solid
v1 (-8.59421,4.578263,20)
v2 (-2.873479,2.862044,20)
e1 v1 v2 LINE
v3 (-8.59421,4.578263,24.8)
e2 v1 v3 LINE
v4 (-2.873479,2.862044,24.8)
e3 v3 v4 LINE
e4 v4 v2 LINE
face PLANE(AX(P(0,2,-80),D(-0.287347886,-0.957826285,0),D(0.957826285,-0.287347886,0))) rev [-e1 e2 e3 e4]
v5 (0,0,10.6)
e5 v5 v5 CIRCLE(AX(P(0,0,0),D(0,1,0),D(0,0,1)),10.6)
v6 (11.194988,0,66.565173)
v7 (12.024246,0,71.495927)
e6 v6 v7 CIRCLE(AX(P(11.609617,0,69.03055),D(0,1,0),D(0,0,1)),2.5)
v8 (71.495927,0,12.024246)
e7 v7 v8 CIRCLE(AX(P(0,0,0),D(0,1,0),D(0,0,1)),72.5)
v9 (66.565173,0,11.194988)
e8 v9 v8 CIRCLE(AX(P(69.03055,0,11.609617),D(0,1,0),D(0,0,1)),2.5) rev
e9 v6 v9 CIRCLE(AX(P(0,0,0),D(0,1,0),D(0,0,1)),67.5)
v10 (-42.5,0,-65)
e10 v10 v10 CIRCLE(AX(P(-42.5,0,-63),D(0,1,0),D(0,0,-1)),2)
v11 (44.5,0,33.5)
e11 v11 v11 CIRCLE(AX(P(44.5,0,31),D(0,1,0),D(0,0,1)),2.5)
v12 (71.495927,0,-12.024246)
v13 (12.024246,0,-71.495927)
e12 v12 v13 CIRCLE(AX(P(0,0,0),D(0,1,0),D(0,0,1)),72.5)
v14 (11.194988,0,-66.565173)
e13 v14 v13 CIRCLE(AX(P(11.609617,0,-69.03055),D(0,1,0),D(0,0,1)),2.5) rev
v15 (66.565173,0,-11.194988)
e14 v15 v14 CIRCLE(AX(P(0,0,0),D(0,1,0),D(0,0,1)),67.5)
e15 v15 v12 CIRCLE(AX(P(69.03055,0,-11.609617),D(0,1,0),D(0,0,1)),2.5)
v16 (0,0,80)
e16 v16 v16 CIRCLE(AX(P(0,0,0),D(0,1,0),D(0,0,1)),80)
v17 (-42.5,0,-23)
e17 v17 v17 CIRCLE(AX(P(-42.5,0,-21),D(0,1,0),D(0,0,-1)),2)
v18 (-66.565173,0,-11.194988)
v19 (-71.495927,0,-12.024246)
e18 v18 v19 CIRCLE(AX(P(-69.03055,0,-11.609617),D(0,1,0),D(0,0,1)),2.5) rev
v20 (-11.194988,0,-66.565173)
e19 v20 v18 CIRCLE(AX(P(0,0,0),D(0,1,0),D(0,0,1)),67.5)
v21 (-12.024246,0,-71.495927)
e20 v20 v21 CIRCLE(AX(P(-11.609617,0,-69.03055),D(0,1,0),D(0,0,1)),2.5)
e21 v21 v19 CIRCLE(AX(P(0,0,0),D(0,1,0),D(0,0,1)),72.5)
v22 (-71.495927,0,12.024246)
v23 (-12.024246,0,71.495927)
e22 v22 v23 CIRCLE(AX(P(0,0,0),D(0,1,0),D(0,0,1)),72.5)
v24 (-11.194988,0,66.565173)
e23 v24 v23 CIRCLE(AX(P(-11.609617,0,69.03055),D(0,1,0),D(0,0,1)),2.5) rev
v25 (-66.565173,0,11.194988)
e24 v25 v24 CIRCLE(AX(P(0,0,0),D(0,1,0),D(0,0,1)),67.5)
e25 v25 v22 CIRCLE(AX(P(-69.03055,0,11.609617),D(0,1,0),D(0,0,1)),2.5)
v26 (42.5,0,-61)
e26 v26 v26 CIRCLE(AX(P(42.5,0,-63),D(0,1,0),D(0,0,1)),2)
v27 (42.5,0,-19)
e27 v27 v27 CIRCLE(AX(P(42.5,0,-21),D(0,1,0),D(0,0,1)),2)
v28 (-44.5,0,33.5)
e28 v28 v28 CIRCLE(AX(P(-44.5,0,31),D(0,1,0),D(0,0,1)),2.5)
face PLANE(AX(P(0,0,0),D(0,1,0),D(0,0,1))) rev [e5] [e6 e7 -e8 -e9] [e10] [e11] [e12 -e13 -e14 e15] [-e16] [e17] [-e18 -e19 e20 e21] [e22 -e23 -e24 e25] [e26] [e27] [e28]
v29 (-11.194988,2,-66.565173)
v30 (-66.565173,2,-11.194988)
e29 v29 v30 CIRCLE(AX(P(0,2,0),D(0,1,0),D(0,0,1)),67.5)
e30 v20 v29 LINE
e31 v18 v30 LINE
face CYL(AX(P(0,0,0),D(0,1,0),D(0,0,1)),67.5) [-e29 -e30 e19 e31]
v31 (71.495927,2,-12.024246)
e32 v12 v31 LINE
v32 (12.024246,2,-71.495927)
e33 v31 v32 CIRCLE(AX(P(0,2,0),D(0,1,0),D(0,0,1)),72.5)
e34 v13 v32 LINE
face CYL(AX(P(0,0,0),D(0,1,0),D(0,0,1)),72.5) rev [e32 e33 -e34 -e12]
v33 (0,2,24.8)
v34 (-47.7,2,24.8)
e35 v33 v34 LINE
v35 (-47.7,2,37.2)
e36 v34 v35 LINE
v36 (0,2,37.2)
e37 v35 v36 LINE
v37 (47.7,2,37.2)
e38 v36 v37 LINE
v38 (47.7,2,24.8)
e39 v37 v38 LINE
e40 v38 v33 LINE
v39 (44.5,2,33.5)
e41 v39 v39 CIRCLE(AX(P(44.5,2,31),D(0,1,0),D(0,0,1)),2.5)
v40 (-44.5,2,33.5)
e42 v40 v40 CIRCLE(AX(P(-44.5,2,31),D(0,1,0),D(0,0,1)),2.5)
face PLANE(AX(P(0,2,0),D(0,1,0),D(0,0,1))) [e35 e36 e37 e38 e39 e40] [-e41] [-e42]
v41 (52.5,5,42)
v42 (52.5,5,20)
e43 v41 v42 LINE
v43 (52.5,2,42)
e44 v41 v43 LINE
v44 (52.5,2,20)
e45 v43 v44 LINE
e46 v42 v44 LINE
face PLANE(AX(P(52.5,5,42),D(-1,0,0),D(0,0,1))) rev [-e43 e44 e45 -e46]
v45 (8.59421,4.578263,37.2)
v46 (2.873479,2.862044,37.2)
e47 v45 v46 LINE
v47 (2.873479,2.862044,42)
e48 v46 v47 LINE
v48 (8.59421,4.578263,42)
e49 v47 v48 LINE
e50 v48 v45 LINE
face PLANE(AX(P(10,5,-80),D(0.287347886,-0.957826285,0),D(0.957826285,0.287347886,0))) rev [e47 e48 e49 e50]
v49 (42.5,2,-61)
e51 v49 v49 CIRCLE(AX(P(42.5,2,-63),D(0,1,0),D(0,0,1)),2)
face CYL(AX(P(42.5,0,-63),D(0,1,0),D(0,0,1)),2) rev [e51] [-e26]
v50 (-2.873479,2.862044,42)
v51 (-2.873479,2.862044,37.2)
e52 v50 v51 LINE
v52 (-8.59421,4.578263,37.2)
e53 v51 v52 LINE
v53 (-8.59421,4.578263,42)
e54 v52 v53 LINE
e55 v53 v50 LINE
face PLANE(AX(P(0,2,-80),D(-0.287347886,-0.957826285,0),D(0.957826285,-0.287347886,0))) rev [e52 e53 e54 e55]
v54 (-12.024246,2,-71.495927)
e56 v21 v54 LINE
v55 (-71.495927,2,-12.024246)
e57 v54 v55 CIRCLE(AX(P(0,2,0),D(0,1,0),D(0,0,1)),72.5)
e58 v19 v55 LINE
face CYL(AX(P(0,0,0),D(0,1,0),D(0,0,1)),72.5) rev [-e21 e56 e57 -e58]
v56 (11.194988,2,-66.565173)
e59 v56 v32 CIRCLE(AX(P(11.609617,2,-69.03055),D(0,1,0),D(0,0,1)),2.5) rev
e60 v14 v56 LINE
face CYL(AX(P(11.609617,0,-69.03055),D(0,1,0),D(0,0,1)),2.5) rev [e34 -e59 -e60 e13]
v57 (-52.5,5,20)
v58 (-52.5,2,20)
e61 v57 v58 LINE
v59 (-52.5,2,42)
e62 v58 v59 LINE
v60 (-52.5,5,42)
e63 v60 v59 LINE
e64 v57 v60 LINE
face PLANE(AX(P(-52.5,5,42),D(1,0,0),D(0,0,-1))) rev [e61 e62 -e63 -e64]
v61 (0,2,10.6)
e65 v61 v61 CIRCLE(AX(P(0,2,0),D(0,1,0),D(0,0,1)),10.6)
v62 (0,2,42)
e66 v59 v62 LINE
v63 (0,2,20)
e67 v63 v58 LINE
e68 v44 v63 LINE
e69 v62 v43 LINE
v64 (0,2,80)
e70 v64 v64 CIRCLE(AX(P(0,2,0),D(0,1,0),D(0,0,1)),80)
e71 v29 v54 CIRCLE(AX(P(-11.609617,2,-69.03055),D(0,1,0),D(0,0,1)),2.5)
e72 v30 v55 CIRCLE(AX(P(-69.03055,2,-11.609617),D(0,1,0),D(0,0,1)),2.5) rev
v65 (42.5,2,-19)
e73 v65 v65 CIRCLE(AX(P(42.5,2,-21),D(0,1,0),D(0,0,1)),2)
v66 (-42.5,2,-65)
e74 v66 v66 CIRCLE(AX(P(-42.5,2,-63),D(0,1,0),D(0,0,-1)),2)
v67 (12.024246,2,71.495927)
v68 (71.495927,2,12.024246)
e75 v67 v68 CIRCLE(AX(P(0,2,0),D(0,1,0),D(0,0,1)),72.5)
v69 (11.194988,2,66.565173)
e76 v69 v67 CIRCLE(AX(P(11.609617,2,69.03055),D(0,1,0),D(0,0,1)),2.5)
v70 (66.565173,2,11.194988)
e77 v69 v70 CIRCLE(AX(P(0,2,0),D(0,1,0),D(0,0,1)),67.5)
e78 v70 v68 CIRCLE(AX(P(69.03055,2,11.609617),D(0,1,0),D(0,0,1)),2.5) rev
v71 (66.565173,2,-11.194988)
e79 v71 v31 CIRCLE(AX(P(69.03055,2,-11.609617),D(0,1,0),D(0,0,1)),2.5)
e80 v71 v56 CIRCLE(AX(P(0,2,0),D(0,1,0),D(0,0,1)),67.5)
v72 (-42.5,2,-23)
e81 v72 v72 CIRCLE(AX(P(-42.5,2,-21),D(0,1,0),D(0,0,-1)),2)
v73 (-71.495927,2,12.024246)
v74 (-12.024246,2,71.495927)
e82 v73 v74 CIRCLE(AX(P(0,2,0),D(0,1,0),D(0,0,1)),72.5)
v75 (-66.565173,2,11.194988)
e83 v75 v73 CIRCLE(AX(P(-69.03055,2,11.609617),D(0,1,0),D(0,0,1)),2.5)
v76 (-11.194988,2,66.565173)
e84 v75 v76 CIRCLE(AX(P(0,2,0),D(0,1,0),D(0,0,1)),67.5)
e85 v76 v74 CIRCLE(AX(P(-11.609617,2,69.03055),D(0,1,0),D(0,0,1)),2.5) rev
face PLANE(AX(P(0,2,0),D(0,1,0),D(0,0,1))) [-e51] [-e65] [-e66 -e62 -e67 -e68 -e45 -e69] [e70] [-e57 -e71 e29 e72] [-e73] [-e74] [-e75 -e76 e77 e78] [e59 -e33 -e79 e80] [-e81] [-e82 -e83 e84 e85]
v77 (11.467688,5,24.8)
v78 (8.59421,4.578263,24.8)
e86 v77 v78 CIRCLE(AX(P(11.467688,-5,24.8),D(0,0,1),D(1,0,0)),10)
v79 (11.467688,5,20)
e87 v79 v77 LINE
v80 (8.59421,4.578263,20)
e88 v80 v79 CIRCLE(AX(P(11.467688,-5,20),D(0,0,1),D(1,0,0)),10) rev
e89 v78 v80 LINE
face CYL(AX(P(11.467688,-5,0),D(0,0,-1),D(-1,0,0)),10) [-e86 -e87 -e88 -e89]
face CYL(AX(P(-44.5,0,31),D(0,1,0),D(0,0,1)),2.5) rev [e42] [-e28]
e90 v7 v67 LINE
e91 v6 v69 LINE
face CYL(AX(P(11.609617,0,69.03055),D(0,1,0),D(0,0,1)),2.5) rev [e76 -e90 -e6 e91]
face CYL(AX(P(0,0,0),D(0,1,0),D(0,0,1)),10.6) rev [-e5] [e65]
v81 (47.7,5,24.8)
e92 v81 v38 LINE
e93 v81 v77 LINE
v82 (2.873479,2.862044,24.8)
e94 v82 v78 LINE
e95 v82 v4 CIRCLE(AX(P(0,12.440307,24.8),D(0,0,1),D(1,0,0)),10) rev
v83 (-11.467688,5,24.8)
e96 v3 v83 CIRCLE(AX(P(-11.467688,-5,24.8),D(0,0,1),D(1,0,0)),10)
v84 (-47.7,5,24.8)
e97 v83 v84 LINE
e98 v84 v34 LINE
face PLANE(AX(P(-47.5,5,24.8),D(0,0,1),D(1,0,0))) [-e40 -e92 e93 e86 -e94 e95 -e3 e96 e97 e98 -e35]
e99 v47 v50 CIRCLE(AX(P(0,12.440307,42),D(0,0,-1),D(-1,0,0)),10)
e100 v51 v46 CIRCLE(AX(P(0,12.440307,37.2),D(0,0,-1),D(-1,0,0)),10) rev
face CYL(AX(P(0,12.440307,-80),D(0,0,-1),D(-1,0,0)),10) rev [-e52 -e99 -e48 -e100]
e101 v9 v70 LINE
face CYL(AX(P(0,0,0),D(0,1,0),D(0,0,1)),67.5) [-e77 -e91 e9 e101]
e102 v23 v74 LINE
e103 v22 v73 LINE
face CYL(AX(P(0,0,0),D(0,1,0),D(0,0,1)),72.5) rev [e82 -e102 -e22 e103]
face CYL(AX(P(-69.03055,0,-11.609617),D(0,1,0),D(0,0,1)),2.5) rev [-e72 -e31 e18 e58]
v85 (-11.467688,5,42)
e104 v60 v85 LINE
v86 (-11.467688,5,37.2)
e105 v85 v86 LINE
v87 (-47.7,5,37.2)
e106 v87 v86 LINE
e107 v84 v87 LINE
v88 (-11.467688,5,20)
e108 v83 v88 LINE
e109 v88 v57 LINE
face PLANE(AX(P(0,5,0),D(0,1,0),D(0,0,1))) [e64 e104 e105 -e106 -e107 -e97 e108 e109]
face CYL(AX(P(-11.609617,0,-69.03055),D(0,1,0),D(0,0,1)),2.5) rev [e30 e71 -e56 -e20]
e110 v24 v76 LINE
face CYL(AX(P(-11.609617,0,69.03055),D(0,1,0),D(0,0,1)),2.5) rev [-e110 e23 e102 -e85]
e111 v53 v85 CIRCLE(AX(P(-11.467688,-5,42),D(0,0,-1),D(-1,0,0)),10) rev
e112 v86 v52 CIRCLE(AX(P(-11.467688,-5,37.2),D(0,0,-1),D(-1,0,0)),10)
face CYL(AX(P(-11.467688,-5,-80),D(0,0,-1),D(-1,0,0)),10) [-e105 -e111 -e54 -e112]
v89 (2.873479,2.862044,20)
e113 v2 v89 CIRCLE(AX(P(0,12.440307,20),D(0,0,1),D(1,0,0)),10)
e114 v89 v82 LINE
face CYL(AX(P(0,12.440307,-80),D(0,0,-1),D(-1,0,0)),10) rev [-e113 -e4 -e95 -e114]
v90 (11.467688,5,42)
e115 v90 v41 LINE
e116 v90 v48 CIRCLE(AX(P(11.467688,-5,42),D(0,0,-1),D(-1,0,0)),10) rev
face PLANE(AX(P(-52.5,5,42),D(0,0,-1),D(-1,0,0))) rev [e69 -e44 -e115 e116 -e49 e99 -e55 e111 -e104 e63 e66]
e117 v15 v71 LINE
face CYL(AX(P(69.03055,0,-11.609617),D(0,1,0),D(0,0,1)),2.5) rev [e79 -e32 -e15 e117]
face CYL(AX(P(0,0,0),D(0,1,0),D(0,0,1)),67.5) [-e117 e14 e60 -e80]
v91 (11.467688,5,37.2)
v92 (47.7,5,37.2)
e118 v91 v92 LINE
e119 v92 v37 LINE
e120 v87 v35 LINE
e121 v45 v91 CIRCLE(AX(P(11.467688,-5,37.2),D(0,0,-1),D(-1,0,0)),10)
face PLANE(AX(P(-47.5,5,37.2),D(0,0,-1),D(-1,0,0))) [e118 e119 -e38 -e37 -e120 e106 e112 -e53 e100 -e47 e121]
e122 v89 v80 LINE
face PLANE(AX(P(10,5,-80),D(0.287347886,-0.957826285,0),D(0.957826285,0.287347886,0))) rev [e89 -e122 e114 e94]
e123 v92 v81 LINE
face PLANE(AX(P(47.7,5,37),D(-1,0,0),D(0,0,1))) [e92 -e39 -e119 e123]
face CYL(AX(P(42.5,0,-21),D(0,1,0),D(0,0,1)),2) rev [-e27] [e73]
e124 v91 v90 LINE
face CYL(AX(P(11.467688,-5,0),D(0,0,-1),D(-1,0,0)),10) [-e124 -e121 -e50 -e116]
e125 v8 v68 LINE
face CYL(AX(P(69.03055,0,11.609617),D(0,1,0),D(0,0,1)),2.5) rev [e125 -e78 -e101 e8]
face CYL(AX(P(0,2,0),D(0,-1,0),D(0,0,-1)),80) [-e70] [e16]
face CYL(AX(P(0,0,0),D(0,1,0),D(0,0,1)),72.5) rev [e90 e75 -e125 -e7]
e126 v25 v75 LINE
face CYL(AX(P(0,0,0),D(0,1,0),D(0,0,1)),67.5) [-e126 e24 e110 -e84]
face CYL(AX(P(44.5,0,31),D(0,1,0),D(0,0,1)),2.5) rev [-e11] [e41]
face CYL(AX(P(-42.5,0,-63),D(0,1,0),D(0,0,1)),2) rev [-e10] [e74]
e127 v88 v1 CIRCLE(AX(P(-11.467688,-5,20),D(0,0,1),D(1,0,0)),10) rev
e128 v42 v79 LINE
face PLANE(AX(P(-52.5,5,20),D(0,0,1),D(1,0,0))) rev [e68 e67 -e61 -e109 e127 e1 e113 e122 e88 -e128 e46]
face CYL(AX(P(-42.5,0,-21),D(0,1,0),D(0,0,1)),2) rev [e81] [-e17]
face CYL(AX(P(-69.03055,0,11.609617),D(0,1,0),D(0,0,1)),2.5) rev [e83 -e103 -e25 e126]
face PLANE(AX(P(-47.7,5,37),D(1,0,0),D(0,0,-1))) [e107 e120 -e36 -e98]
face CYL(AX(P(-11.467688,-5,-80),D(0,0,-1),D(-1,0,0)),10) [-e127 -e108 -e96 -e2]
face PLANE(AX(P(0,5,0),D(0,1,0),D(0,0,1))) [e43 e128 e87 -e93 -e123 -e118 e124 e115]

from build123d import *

# Parameters (mm, degrees)
SKETCH1_R           = 80
BOSS_EXTRUDE1_DEPTH = 2
CUT_EXTRUDE1_DEPTH  = 2
SKETCH3_R           = 2.5000000000000027
CUT_EXTRUDE2_DEPTH  = 114.15476127852509
SKETCH4_W           = 105.00000000000001
SKETCH4_H           = 21.999999999999993
SKETCH4_W_2         = 95
SKETCH4_H_2         = 12
BOSS_EXTRUDE2_DEPTH = 3
CUT_EXTRUDE3_DEPTH  = 146.9760254288354
FILLET1_R           = 10
SKETCH6_R           = 2.0000000000000036
CUT_EXTRUDE4_DEPTH  = 114.17685290111224
MOVE_FACE1_BY       = 0.2
MOVE_FACE1_2_BY     = 0.2
MOVE_FACE1_3_BY     = 0.2
MOVE_FACE1_4_BY     = 0.2
SKETCH7_R           = 10.6
CUT_EXTRUDE5_DEPTH  = 114.17685290111224


with BuildPart() as part:
    # Sketch1 → Boss-Extrude1 (new body)
    with BuildSketch(Plane(origin=(0, 0, 0), x_dir=(1, 0, 0), z_dir=(0, 1, 0))):
        Circle(SKETCH1_R)
    extrude(amount=BOSS_EXTRUDE1_DEPTH)

    # Sketch2 → Cut-Extrude1 (cut)
    with BuildSketch(Plane(origin=(0, 2, 0), x_dir=(1, 0, 0), z_dir=(0, 1, 0))):
        with BuildLine():
            ThreePointArc((-11.194987519973791, 66.5651729842839), (-9.14423991018458, 69.44517892888601), (-12.024245854786658, 71.49592653867526))
            ThreePointArc((-12.024245854786658, 71.49592653867526), (-51.265241636024435, 51.26524163602498), (-71.49592653867512, 12.02424585478741))
            ThreePointArc((-71.49592653867514, 12.024245854787408), (-69.44517892888592, 9.144239910185334), (-66.5651729842838, 11.194987519974491))
            ThreePointArc((-66.56517298428382, 11.194987519974493), (-47.72970773009176, 47.72970773009226), (-11.194987519973797, 66.56517298428392))
        make_face()
        with BuildLine():
            ThreePointArc((12.02424585478666, 71.49592653867526), (9.14423991018458, 69.44517892888601), (11.194987519973791, 66.5651729842839))
            ThreePointArc((11.194987519973797, 66.56517298428392), (47.729707730092095, 47.72970773009193), (66.56517298428396, 11.194987519973562))
            ThreePointArc((66.56517298428395, 11.19498751997356), (69.44517892888604, 9.144239910184341), (71.4959265386753, 12.024245854786408))
            ThreePointArc((71.49592653867529, 12.024245854786408), (51.265241636024804, 51.265241636024626), (12.02424585478666, 71.49592653867526))
        make_face()
        with BuildLine():
            ThreePointArc((71.49592653867522, -12.024245854786907), (69.44517892888598, -9.144239910184819), (66.56517298428386, -11.194987519974026))
            ThreePointArc((66.56517298428388, -11.194987519974019), (47.72970773009176, -47.729707730092265), (11.194987519973328, -66.565172984284))
            ThreePointArc((11.194987519973324, -66.56517298428399), (9.144239910184115, -69.44517892888608), (12.024245854786155, -71.49592653867535))
            ThreePointArc((12.024245854786159, -71.49592653867536), (51.26524163602445, -51.265241636024996), (71.49592653867523, -12.024245854786914))
        make_face()
        with BuildLine():
            ThreePointArc((-12.02424585478716, -71.49592653867518), (-9.144239910185082, -69.44517892888595), (-11.194987519974264, -66.56517298428383))
            ThreePointArc((-11.194987519974267, -66.56517298428385), (-47.72970773009242, -47.72970773009158), (-66.56517298428403, -11.194987519973097))
            ThreePointArc((-66.56517298428402, -11.194987519973095), (-69.4451789288861, -9.144239910183853), (-71.49592653867538, -12.024245854785907))
            ThreePointArc((-71.49592653867539, -12.02424585478591), (-51.26524163602516, -51.26524163602427), (-12.024245854787168, -71.49592653867518))
        make_face()
    extrude(amount=-CUT_EXTRUDE1_DEPTH, mode=Mode.SUBTRACT)

    # Sketch3 → Cut-Extrude2 (cut, through all)
    with BuildSketch(Plane(origin=(0, 2, 0), x_dir=(1, 0, 0), z_dir=(0, 1, 0))):
        with Locations((-44.49999999999999, -31.00000000000001)):
            Circle(SKETCH3_R)
        with Locations((44.50000000000001, -31)):
            Circle(SKETCH3_R)
    extrude(amount=-CUT_EXTRUDE2_DEPTH, mode=Mode.SUBTRACT)

    # Sketch4 → Boss-Extrude2 (add)
    with BuildSketch(Plane(origin=(0, 2, 0), x_dir=(1, 0, 0), z_dir=(0, 1, 0))):
        with Locations((0, -31.000000000000004)):
            Rectangle(SKETCH4_W, SKETCH4_H)
        with Locations((0, -31.000000000000007)):
            Rectangle(SKETCH4_W_2, SKETCH4_H_2, mode=Mode.SUBTRACT)
    extrude(amount=BOSS_EXTRUDE2_DEPTH)

    # Sketch5 → Cut-Extrude3 (cut, through all)
    with BuildSketch(Plane.XY.offset(42)):
        Polygon((3.469e-14, 2), (-10, 5.000000000000003), (10, 5.000000000000008), align=None)
    extrude(amount=-CUT_EXTRUDE3_DEPTH, mode=Mode.SUBTRACT)

    # Fillet1
    fillet1_edges = [part.edges().sort_by_distance(p)[0] for p in [
        (10, 5.000000000000008, 39.5),
        (10, 5.000000000000008, 22.500000000000007),
        (3.469e-14, 2, 22.500000000000007),
        (3.469e-14, 2, 39.5),
        (-10, 5.000000000000003, 39.5),
        (-10, 5.000000000000003, 22.500000000000007),
    ]]
    fillet(fillet1_edges, radius=FILLET1_R)

    # Sketch6 → Cut-Extrude4 (cut, through all)
    with BuildSketch(Plane(origin=(0, 2, 0), x_dir=(1, 0, 0), z_dir=(0, 1, 0))):
        with Locations((42.499999999999986, 63)):
            Circle(SKETCH6_R)
        with Locations((42.49999999999999, 20.999999999999996)):
            Circle(SKETCH6_R)
        with Locations((-42.49999999999999, 20.999999999999996)):
            Circle(SKETCH6_R)
        with Locations((-42.499999999999986, 63)):
            Circle(SKETCH6_R)
    extrude(amount=-CUT_EXTRUDE4_DEPTH, mode=Mode.SUBTRACT)

    # Move Face1: a face moved inward by 0.2
    extrude(part.faces().sort_by_distance((47.5, 3.5, 31))[0], amount=MOVE_FACE1_BY, dir=(1, 0, 0), mode=Mode.SUBTRACT)

    # Move Face1 2: a face moved inward by 0.2
    extrude(part.faces().sort_by_distance((0, 2.3, 37))[0], amount=MOVE_FACE1_2_BY, dir=(0, 0, 1), mode=Mode.SUBTRACT)

    # Move Face1 3: a face moved inward by 0.2
    extrude(part.faces().sort_by_distance((-47.5, 3.5, 31))[0], amount=MOVE_FACE1_3_BY, dir=(-1, 0, 0), mode=Mode.SUBTRACT)

    # Move Face1 4: a face moved inward by 0.2
    extrude(part.faces().sort_by_distance((0, 2.3, 25))[0], amount=MOVE_FACE1_4_BY, dir=(0, 0, -1), mode=Mode.SUBTRACT)

    # Sketch7 → Cut-Extrude5 (cut, through all)
    with BuildSketch(Plane(origin=(0, 2, 0), x_dir=(1, 0, 0), z_dir=(0, 1, 0))):
        Circle(SKETCH7_R)
    extrude(amount=-CUT_EXTRUDE5_DEPTH, mode=Mode.SUBTRACT)


solid = part.part
